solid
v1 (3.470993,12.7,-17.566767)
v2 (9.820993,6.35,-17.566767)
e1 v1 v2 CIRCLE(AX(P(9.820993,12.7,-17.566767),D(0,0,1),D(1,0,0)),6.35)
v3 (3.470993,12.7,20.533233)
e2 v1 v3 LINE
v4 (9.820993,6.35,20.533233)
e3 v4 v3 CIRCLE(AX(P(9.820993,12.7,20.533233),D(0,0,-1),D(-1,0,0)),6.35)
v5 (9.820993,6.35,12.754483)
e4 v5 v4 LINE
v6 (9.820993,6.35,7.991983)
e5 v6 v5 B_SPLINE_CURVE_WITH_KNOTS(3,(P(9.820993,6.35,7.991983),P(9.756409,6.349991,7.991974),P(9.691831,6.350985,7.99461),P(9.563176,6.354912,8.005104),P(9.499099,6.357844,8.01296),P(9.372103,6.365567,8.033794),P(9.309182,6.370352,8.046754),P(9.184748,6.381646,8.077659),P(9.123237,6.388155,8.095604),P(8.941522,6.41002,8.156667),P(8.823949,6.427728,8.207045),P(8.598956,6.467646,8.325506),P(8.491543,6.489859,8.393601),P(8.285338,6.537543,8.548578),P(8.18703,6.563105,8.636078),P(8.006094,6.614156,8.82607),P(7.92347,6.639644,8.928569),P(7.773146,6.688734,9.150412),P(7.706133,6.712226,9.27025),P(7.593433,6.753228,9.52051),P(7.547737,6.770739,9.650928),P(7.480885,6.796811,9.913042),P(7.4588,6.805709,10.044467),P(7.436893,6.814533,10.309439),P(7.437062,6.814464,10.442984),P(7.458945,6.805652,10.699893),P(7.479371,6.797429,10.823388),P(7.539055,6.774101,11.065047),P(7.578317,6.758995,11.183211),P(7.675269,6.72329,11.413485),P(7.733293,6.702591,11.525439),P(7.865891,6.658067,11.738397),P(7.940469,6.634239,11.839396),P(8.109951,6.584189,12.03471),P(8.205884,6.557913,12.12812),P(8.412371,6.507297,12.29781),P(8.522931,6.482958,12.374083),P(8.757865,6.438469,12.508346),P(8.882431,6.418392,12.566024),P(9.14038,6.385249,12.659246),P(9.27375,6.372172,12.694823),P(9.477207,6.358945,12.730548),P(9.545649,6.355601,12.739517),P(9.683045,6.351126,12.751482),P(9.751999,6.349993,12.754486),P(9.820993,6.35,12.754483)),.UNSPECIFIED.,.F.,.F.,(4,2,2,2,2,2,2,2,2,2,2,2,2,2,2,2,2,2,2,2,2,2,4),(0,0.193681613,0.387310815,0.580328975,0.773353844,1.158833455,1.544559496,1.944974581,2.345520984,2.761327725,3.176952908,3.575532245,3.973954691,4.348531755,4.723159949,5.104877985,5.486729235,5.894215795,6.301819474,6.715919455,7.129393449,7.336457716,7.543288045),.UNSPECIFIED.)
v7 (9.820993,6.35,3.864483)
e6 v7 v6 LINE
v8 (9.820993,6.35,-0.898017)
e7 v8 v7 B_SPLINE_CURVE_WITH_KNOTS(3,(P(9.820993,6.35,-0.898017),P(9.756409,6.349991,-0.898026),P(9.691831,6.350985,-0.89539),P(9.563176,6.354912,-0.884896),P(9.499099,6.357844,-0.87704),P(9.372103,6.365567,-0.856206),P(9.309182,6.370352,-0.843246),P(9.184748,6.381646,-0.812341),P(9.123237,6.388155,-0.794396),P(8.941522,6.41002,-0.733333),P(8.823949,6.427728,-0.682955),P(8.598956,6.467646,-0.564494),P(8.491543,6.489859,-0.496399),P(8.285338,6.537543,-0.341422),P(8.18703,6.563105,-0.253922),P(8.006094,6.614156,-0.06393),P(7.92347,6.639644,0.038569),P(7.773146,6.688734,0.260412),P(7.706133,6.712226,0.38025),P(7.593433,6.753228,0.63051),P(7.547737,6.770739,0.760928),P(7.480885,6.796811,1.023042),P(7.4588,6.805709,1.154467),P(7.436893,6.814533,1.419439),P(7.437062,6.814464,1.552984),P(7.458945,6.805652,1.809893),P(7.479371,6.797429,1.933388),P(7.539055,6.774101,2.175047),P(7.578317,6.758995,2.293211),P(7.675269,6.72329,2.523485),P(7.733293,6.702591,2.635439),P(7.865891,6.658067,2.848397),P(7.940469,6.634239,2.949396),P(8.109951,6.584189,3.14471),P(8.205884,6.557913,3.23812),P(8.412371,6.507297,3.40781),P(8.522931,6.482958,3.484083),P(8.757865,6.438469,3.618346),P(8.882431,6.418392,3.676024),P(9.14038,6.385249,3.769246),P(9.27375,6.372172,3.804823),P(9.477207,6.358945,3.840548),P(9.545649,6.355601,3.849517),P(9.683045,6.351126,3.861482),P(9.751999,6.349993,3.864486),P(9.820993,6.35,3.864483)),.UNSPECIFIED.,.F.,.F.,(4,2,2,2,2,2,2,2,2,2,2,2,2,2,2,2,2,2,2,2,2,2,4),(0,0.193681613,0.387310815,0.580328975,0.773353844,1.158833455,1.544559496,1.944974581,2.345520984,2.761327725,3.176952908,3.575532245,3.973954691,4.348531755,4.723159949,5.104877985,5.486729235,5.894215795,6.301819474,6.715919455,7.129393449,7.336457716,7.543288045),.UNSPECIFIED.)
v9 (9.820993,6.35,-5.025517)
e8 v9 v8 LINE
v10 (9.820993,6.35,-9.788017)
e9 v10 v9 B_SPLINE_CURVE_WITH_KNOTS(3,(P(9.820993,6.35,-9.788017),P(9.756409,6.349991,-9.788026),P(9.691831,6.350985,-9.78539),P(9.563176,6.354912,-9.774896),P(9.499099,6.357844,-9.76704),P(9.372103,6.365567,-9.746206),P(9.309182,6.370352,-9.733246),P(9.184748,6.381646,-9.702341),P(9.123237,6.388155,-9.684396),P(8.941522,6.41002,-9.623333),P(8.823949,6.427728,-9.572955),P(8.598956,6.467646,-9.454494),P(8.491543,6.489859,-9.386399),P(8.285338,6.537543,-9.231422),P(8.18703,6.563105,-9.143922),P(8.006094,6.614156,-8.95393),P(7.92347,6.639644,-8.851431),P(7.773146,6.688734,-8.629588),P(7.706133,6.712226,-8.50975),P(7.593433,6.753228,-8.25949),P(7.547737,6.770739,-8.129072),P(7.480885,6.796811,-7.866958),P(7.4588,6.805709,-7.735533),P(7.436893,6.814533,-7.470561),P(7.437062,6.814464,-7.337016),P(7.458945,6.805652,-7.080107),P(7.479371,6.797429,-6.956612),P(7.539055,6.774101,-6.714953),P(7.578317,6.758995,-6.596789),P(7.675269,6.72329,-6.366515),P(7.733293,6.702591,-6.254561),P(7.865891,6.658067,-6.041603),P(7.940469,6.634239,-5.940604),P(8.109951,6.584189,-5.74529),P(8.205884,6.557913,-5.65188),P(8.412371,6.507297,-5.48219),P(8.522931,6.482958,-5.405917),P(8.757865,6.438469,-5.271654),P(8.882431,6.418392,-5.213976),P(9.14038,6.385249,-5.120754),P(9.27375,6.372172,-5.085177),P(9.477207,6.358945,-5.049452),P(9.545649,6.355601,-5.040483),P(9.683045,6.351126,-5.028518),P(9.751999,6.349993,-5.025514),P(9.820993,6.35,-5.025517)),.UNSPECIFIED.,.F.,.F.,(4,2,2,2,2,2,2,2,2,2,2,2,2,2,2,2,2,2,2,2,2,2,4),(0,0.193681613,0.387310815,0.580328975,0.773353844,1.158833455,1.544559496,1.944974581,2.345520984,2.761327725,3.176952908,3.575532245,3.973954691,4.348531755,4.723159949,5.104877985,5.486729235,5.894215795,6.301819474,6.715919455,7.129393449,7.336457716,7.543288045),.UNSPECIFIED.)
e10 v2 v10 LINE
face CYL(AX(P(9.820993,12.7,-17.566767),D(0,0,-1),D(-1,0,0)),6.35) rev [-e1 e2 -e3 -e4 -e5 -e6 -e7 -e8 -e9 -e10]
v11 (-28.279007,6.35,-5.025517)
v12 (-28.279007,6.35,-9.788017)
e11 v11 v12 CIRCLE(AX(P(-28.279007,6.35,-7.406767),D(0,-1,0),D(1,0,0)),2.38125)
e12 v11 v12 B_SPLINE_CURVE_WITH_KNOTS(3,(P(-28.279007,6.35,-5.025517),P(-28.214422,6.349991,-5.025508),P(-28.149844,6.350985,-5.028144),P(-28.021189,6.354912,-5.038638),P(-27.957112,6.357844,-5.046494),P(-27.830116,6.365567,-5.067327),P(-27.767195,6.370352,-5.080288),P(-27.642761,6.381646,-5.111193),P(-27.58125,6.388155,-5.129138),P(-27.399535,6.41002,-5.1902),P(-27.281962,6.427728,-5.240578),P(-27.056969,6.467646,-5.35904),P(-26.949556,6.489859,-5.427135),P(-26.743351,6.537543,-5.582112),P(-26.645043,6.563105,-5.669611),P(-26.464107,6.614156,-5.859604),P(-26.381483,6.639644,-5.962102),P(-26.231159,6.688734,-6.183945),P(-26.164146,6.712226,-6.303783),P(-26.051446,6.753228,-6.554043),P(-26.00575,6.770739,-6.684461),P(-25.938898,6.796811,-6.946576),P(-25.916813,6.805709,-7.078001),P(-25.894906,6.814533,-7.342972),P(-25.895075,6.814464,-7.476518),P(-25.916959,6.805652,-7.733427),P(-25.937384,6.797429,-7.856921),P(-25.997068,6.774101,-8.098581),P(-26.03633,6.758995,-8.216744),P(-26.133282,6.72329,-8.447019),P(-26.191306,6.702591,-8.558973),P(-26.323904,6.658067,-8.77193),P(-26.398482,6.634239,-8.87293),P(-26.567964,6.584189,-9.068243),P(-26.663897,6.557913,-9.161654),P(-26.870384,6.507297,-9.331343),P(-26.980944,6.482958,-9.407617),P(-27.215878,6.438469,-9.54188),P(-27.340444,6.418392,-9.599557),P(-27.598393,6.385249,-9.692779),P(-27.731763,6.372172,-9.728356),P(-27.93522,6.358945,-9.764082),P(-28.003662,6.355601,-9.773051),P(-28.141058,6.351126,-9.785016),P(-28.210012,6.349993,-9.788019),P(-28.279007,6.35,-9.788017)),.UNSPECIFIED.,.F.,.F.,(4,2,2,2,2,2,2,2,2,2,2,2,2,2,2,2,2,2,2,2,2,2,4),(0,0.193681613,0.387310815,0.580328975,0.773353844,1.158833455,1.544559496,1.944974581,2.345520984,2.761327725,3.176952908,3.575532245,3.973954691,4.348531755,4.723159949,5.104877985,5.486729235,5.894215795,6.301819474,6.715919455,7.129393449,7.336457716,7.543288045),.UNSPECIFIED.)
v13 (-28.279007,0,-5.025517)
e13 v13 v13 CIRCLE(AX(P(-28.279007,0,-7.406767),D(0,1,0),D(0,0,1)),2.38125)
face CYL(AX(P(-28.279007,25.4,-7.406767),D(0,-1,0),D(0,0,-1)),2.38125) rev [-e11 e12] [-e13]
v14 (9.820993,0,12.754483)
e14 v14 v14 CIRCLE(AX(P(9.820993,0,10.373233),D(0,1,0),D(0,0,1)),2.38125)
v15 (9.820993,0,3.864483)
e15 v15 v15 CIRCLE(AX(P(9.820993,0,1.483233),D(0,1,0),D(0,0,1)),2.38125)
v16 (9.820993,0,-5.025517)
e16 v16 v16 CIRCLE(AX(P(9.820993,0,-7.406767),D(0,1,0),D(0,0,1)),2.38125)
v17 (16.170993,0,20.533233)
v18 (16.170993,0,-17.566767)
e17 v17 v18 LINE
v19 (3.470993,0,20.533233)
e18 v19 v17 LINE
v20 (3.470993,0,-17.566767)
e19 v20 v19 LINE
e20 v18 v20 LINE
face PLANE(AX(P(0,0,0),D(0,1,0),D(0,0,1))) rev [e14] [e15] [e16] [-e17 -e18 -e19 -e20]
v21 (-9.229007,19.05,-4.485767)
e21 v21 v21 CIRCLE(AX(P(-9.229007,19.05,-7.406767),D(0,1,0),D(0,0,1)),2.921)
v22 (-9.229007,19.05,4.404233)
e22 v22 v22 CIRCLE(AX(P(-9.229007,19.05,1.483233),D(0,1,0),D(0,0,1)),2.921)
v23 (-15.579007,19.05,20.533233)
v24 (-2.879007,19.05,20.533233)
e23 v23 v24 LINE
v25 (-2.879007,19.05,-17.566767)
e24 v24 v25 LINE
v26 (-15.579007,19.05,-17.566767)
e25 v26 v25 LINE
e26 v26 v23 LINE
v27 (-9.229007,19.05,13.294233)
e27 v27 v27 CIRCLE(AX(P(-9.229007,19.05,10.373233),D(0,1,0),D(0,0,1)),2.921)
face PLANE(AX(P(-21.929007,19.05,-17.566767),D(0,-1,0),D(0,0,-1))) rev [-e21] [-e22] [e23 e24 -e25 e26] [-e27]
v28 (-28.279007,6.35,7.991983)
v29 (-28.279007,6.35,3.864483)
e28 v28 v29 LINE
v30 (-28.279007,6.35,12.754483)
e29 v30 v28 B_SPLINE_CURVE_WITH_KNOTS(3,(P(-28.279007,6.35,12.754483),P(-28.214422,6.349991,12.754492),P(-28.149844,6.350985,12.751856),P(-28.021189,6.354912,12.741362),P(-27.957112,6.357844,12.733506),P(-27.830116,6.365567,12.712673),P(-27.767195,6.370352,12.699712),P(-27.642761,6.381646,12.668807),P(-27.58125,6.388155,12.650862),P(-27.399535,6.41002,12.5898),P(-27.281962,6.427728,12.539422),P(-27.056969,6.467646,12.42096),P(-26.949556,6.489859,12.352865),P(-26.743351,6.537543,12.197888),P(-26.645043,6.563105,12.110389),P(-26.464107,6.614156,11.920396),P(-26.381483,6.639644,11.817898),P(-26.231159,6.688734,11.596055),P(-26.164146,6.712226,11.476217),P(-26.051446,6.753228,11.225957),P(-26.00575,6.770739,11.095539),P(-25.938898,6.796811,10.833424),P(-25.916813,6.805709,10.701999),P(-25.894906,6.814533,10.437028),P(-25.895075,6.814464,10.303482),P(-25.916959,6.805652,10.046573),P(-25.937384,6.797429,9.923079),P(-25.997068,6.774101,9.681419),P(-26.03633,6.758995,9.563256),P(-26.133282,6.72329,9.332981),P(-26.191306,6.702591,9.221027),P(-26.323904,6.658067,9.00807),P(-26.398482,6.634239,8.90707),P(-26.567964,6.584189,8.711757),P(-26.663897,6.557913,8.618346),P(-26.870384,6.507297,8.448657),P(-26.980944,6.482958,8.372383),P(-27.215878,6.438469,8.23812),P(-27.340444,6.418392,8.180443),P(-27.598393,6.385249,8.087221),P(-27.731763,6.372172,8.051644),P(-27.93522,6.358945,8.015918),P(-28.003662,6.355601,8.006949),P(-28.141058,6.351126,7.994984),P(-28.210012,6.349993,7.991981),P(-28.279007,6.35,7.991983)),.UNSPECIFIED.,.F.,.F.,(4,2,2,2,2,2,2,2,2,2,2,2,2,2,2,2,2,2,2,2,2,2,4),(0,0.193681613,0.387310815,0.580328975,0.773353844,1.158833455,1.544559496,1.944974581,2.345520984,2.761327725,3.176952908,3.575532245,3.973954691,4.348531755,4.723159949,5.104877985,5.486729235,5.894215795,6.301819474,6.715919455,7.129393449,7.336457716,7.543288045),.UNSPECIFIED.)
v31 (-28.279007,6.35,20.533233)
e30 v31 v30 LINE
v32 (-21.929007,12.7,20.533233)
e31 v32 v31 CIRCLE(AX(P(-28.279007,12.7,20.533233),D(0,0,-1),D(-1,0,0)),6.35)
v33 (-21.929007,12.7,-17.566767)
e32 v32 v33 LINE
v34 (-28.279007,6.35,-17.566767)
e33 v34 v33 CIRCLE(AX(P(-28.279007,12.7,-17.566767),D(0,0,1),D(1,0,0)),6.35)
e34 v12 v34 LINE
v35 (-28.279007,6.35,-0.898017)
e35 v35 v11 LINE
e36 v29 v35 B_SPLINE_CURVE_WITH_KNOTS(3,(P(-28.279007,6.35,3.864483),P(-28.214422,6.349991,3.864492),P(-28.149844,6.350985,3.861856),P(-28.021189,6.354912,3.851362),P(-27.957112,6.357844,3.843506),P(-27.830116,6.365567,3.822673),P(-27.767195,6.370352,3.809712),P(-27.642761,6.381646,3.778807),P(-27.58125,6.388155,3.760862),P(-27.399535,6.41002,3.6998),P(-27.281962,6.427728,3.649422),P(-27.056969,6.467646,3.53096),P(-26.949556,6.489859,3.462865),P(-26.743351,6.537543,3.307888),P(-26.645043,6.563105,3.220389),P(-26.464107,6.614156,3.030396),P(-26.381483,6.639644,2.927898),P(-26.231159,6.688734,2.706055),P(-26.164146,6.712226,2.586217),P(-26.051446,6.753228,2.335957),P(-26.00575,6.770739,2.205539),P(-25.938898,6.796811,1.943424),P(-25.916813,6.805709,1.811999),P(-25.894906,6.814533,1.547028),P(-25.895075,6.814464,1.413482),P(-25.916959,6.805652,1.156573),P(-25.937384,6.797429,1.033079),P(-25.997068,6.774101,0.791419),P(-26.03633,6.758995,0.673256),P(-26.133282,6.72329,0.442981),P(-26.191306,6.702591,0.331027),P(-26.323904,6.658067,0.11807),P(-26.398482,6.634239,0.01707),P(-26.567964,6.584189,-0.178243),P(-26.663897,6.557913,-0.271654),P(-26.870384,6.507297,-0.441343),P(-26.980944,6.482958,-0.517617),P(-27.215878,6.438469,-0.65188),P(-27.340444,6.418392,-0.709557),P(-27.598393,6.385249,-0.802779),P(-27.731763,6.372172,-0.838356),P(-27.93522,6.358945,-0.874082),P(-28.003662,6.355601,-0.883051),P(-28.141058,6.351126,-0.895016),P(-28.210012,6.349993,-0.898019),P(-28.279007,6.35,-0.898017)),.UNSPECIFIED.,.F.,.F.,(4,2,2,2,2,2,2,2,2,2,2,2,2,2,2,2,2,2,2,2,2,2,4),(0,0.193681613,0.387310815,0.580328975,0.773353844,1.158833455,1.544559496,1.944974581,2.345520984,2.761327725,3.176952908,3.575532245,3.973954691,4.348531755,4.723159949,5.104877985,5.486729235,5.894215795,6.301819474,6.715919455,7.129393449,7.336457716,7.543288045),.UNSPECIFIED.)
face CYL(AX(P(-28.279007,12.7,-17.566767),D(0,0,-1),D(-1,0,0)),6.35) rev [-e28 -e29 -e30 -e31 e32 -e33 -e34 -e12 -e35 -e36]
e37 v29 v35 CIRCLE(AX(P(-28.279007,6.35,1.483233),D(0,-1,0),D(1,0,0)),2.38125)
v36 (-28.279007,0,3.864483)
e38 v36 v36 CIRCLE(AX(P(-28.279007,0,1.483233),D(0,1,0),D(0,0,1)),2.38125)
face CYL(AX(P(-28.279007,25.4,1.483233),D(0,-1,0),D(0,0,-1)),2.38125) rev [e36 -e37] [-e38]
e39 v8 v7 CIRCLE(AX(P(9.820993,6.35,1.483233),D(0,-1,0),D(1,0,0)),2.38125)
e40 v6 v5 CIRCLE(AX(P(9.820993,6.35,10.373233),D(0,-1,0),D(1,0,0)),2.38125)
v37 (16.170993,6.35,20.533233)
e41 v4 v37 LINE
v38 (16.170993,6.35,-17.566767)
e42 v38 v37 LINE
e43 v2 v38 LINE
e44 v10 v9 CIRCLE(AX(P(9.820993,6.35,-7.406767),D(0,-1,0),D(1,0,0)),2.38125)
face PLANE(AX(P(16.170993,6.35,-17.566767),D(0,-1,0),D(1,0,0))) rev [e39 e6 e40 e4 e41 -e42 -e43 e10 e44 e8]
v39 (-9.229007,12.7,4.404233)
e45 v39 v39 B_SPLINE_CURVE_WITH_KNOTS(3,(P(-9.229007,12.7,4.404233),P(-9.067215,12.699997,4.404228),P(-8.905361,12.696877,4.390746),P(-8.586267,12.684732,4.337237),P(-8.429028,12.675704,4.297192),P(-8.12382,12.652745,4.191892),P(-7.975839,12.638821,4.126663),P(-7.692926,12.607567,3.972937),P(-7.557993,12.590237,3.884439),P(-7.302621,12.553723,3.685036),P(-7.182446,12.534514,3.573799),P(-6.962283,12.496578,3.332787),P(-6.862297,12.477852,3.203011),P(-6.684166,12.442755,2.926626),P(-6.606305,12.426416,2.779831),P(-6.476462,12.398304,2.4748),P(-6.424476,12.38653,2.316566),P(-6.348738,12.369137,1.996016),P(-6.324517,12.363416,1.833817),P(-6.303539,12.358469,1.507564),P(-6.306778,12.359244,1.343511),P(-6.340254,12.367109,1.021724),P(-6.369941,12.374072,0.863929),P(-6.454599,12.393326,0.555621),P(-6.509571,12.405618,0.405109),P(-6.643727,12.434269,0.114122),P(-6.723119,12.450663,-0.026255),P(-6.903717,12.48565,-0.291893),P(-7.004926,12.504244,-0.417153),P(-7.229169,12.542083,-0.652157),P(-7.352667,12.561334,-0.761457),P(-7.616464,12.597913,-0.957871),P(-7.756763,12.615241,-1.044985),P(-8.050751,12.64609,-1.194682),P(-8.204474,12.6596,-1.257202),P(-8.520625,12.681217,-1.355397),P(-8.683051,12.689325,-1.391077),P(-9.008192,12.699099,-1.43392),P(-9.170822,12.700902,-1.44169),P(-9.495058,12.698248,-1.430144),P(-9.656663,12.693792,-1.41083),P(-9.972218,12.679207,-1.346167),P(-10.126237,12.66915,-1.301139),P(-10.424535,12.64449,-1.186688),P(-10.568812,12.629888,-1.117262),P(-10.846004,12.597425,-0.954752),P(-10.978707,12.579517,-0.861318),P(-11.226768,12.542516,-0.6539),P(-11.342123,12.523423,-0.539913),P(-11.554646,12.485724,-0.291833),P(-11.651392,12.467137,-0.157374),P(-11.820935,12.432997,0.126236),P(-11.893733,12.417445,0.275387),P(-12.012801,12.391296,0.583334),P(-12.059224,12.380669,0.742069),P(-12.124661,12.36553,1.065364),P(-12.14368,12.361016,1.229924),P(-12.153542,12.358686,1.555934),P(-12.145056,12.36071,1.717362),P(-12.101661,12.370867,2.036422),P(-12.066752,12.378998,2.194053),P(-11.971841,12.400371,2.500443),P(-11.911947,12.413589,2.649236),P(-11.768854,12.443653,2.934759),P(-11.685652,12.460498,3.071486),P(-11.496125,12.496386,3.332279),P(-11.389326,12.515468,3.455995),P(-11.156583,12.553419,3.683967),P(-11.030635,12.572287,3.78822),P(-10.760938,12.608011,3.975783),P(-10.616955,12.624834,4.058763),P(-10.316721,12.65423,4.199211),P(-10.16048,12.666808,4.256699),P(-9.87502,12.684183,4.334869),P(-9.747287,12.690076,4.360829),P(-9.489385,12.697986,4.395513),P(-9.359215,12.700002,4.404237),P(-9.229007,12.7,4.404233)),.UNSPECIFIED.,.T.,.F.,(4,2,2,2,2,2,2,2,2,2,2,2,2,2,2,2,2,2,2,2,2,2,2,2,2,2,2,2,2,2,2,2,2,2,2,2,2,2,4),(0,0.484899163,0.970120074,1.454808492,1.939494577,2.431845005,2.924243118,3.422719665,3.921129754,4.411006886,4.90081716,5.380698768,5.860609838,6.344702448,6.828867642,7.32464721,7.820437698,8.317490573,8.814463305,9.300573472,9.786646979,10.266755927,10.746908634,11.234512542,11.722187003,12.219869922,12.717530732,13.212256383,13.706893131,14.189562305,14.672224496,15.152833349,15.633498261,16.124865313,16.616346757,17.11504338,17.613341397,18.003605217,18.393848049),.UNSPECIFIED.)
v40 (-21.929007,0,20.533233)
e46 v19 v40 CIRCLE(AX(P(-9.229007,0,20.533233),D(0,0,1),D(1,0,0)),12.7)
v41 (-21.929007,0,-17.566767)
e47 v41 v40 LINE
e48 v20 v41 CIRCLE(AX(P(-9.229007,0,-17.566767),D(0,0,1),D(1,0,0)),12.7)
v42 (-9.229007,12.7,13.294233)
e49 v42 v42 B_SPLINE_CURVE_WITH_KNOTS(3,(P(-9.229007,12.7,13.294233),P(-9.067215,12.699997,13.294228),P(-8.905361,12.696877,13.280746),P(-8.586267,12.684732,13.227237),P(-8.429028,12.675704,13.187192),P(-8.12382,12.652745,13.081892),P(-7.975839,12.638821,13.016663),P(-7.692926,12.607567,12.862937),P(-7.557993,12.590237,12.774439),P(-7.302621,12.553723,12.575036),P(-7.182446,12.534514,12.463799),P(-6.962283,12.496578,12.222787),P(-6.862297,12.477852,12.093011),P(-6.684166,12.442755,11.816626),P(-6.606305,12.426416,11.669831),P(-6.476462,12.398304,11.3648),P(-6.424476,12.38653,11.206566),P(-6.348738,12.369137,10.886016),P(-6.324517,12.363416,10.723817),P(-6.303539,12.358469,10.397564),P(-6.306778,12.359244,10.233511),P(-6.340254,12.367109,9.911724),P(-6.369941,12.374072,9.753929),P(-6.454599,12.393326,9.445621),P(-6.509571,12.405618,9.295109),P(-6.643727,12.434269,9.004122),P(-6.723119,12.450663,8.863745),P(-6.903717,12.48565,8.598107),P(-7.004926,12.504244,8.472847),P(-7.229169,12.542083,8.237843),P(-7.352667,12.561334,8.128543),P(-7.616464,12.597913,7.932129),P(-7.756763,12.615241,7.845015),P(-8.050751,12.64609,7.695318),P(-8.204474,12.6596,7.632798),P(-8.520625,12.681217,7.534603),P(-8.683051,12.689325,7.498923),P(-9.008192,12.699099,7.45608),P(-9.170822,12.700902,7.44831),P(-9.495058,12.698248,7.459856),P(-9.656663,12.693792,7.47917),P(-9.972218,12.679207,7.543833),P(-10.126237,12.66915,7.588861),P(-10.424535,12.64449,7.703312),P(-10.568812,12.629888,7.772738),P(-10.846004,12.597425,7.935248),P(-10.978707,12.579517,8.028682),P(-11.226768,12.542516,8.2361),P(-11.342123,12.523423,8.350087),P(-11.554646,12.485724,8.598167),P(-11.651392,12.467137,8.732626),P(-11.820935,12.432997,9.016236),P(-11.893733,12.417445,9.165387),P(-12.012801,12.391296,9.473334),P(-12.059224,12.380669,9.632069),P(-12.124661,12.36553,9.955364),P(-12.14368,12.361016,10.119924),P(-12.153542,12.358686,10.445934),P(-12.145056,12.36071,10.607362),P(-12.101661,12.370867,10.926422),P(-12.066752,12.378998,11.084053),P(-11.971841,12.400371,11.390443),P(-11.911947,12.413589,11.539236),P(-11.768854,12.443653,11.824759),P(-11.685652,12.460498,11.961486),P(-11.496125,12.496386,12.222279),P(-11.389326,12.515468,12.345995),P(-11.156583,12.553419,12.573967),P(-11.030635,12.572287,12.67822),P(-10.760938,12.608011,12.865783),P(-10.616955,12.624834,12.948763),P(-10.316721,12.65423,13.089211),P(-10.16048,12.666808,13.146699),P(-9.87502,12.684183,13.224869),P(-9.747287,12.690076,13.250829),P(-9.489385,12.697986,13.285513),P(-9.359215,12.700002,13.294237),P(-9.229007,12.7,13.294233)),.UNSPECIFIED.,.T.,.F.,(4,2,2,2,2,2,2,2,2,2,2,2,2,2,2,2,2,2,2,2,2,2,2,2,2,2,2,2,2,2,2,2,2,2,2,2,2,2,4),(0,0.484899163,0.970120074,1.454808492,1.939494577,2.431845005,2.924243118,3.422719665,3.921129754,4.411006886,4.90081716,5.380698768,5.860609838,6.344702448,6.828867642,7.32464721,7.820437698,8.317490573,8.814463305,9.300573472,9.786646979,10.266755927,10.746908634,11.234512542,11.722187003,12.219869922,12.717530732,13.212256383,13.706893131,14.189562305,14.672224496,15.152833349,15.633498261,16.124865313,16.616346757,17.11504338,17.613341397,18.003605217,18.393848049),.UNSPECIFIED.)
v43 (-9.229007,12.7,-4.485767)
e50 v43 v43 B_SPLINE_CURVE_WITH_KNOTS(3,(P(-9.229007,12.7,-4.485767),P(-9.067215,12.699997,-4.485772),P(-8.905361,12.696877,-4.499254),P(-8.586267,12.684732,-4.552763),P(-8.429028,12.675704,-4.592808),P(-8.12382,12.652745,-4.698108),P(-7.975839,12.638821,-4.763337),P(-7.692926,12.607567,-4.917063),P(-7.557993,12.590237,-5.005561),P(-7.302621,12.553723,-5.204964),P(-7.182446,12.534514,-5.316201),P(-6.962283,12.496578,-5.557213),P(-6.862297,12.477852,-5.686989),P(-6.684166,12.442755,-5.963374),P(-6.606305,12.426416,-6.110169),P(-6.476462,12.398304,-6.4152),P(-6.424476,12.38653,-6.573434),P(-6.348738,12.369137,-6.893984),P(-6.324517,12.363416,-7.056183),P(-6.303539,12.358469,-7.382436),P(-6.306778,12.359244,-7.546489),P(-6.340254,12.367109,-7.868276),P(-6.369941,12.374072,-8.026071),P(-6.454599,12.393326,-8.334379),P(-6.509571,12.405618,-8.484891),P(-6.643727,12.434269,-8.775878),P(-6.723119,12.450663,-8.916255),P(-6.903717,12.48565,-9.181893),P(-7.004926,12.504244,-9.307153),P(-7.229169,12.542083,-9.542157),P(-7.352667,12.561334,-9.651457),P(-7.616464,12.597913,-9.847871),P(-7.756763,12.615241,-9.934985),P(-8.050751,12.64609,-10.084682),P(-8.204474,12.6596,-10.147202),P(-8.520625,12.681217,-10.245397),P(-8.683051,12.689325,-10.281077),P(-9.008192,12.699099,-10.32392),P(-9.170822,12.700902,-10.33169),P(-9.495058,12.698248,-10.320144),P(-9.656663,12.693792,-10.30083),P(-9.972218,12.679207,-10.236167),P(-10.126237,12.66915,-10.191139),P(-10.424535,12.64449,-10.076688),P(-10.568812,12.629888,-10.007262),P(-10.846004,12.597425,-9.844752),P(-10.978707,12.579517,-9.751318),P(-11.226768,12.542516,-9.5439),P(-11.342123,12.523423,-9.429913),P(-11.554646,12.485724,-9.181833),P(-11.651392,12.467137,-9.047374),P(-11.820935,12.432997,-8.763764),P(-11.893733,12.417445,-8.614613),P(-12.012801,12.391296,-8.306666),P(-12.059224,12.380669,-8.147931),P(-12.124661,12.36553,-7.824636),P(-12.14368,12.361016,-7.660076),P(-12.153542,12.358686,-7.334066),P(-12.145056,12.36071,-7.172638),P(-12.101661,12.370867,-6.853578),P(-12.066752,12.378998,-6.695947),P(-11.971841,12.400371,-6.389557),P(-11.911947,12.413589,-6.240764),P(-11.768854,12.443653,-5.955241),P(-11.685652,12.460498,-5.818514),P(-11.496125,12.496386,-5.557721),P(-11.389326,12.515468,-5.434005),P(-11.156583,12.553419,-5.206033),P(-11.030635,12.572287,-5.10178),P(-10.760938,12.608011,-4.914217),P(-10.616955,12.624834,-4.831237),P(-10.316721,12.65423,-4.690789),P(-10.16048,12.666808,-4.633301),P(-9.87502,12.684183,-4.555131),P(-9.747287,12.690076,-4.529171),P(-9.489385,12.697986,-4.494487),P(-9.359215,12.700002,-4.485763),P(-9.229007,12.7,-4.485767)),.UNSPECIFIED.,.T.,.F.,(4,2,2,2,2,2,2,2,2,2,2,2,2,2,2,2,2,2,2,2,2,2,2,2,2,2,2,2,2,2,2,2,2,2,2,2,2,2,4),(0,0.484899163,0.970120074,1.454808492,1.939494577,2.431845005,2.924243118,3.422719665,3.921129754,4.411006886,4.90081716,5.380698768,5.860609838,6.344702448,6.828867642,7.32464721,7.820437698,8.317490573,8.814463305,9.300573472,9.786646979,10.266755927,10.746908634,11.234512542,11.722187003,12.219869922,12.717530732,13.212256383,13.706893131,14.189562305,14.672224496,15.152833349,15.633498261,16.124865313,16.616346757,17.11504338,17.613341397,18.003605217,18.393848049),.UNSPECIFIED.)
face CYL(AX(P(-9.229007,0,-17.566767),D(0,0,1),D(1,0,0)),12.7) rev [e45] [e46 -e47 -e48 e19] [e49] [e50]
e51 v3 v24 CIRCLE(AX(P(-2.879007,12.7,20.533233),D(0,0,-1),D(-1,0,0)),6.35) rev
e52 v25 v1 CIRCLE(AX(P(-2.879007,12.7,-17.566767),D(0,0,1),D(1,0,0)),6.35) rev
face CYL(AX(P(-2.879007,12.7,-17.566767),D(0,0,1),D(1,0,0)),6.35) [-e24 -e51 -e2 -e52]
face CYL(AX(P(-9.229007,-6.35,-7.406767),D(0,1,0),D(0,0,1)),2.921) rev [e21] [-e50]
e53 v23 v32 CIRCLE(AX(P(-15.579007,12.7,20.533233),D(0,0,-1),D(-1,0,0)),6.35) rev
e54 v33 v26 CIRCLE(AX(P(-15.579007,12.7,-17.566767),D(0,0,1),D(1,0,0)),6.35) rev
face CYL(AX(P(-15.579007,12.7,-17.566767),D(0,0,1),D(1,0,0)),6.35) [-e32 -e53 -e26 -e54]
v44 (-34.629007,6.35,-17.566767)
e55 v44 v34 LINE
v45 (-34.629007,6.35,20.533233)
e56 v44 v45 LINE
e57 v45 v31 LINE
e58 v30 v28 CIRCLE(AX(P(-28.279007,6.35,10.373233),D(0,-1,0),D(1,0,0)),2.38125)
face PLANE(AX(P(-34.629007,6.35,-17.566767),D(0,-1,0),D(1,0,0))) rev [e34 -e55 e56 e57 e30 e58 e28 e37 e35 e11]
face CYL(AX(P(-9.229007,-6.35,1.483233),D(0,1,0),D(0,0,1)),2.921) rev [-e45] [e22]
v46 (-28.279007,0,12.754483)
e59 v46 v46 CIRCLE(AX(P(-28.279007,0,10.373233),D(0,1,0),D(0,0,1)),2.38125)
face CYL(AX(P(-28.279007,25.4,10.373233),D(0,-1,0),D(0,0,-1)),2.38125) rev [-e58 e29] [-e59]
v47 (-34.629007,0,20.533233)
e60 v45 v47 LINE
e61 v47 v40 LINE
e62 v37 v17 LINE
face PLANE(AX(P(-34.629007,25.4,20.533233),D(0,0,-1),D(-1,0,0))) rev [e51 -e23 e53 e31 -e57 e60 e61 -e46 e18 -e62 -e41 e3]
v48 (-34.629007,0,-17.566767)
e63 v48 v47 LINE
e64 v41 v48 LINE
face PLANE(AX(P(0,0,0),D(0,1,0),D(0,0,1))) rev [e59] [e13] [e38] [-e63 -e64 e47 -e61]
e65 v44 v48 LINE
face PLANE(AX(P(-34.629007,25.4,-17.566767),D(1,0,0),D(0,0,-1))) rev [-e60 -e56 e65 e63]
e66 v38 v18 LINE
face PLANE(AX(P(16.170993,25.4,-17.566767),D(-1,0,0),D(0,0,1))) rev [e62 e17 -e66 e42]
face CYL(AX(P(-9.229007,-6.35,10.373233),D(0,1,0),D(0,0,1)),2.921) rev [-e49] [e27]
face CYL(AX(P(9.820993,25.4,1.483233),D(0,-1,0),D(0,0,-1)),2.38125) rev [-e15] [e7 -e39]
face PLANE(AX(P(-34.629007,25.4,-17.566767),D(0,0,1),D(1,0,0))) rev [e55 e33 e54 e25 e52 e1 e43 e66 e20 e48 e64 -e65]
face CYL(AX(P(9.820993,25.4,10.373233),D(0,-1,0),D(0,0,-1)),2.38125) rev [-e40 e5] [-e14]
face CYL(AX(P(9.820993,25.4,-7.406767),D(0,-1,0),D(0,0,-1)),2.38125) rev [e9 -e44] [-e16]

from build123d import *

# Parameters (mm, degrees)
SKETCH1_W           = 50.8
SKETCH1_H           = 38.1
SKETCH1_R           = 2.38125
BOSS_EXTRUDE1_DEPTH = 25.4
CUT_EXTRUDE1_DEPTH  = 58.410261207
FILLET1_R           = 6.35
SKETCH3_R           = 2.921
CUT_EXTRUDE2_DEPTH  = 25.4


with BuildPart() as part:
    # Sketch1 → Boss-Extrude1 (new body)
    with BuildSketch(Plane(origin=(0, 0, 0), x_dir=(1, 0, 0), z_dir=(0, 1, 0))):
        with Locations((-9.229006509, -1.483233189)):
            Rectangle(SKETCH1_W, SKETCH1_H)
        with Locations(Location((-28.279006509, 7.406766811, 0), (0, 0, 270))):
            Circle(SKETCH1_R, mode=Mode.SUBTRACT)
        with Locations(Location((-28.279006509, -1.483233189, 0), (0, 0, 270))):
            Circle(SKETCH1_R, mode=Mode.SUBTRACT)
        with Locations(Location((-28.279006509, -10.373233189, 0), (0, 0, 270))):
            Circle(SKETCH1_R, mode=Mode.SUBTRACT)
        with Locations(Location((9.820993491, -10.373233189, 0), (0, 0, 270))):
            Circle(SKETCH1_R, mode=Mode.SUBTRACT)
        with Locations(Location((9.820993491, -1.483233189, 0), (0, 0, 270))):
            Circle(SKETCH1_R, mode=Mode.SUBTRACT)
        with Locations(Location((9.820993491, 7.406766811, 0), (0, 0, 270))):
            Circle(SKETCH1_R, mode=Mode.SUBTRACT)
    extrude(amount=BOSS_EXTRUDE1_DEPTH)

    # Sketch2 → Cut-Extrude1 (cut, through all)
    with BuildSketch(Plane.XY.offset(20.533233189)):
        with BuildLine():
            Line((-21.929006509, 0), (3.470993491, 0))
            ThreePointArc((3.470993491, 0), (-9.229006509, 12.7), (-21.929006509, 0))
        make_face()
        Polygon((-25.739006509, 25.4), (7.280993491, 25.4), (16.170993491, 25.4), (16.170993491, 6.35), (3.470993491, 6.35), (3.470993491, 19.05), (-21.929006509, 19.05), (-21.929006509, 6.35), (-34.629006509, 6.35), (-34.629006509, 25.4), align=None)
    extrude(amount=-CUT_EXTRUDE1_DEPTH, mode=Mode.SUBTRACT)

    # Fillet1
    # the kernel refuses this fillet: 6.35 mm, written as the material it adds along each edge
    with BuildSketch(Plane(origin=(3.470993491, 6.35, 20.533233189), x_dir=(1, 0, 0), z_dir=(0, 0, -1))) as fillet1_piece_1_section:
        with BuildLine():
            CenterArc((FILLET1_R, -FILLET1_R), FILLET1_R, 90, 90)
            Line((0, -FILLET1_R), (0, 0))
            Line((0, 0), (FILLET1_R, 0))
        make_face()
    fillet1_piece_1 = extrude(amount=38.1, mode=Mode.PRIVATE)
    fillet1_piece_1 = fillet1_piece_1 - Plane(origin=(9.820993491, 7.811257132, -7.406766811), x_dir=(0, 0, 1), z_dir=(0, -1, 0)) * Cylinder(2.38125, 102, mode=Mode.PRIVATE)
    fillet1_piece_1 = fillet1_piece_1 - Plane(origin=(9.820993491, 7.811257132, 1.483233189), x_dir=(0, 0, 1), z_dir=(0, -1, 0)) * Cylinder(2.38125, 102, mode=Mode.PRIVATE)
    fillet1_piece_1 = fillet1_piece_1 - Plane(origin=(9.820993491, 7.811257132, 10.373233189), x_dir=(0, 0, 1), z_dir=(0, -1, 0)) * Cylinder(2.38125, 102, mode=Mode.PRIVATE)
    add(fillet1_piece_1)
    with BuildSketch(Plane(origin=(-21.929006509, 6.35, 20.533233189), x_dir=(0, 1, 0), z_dir=(0, 0, -1))) as fillet1_piece_2_section:
        with BuildLine():
            CenterArc((FILLET1_R, -FILLET1_R), FILLET1_R, 90, 90)
            Line((0, -FILLET1_R), (0, 0))
            Line((0, 0), (FILLET1_R, 0))
        make_face()
    fillet1_piece_2 = extrude(amount=38.1, mode=Mode.PRIVATE)
    fillet1_piece_2 = fillet1_piece_2 - Plane(origin=(-28.279006509, 7.811257363, -7.406766811), x_dir=(0, 0, 1), z_dir=(0, -1, 0)) * Cylinder(2.38125, 102, mode=Mode.PRIVATE)
    fillet1_piece_2 = fillet1_piece_2 - Plane(origin=(-28.279006509, 7.811257363, 1.483233189), x_dir=(0, 0, 1), z_dir=(0, -1, 0)) * Cylinder(2.38125, 102, mode=Mode.PRIVATE)
    fillet1_piece_2 = fillet1_piece_2 - Plane(origin=(-28.279006509, 7.811257363, 10.373233189), x_dir=(0, 0, 1), z_dir=(0, -1, 0)) * Cylinder(2.38125, 102, mode=Mode.PRIVATE)
    add(fillet1_piece_2)
    # the kernel refuses this fillet: 6.35 mm, written as the material it takes off along each edge
    with BuildSketch(Plane(origin=(3.470993491, 19.05, 36.408233189), x_dir=(0, -1, 0), z_dir=(0, 0, -1)), Plane(origin=(-21.929006509, 19.05, 36.408233189), x_dir=(1, 0, 0), z_dir=(0, 0, -1))) as fillet1_2_piece_1:
        with BuildLine():
            CenterArc((FILLET1_R, FILLET1_R), FILLET1_R, 180, 90)
            Line((0, FILLET1_R), (0, 0))
            Line((0, 0), (FILLET1_R, 0))
        make_face()
    extrude(amount=69.85, mode=Mode.SUBTRACT)

    # Sketch3 → Cut-Extrude2 (cut)
    with BuildSketch(Plane(origin=(0, 19.05, 0), x_dir=(1, 0, 0), z_dir=(0, 1, 0))):
        with Locations(Location((-9.229006509, -1.483233189, 0), (0, 0, 270))):
            Circle(SKETCH3_R)
        with Locations(Location((-9.229006509, 7.406766811, 0), (0, 0, 270))):
            Circle(SKETCH3_R)
        with Locations(Location((-9.229006509, -10.373233189, 0), (0, 0, 270))):
            Circle(SKETCH3_R)
    extrude(amount=-CUT_EXTRUDE2_DEPTH, mode=Mode.SUBTRACT)


solid = part.part
